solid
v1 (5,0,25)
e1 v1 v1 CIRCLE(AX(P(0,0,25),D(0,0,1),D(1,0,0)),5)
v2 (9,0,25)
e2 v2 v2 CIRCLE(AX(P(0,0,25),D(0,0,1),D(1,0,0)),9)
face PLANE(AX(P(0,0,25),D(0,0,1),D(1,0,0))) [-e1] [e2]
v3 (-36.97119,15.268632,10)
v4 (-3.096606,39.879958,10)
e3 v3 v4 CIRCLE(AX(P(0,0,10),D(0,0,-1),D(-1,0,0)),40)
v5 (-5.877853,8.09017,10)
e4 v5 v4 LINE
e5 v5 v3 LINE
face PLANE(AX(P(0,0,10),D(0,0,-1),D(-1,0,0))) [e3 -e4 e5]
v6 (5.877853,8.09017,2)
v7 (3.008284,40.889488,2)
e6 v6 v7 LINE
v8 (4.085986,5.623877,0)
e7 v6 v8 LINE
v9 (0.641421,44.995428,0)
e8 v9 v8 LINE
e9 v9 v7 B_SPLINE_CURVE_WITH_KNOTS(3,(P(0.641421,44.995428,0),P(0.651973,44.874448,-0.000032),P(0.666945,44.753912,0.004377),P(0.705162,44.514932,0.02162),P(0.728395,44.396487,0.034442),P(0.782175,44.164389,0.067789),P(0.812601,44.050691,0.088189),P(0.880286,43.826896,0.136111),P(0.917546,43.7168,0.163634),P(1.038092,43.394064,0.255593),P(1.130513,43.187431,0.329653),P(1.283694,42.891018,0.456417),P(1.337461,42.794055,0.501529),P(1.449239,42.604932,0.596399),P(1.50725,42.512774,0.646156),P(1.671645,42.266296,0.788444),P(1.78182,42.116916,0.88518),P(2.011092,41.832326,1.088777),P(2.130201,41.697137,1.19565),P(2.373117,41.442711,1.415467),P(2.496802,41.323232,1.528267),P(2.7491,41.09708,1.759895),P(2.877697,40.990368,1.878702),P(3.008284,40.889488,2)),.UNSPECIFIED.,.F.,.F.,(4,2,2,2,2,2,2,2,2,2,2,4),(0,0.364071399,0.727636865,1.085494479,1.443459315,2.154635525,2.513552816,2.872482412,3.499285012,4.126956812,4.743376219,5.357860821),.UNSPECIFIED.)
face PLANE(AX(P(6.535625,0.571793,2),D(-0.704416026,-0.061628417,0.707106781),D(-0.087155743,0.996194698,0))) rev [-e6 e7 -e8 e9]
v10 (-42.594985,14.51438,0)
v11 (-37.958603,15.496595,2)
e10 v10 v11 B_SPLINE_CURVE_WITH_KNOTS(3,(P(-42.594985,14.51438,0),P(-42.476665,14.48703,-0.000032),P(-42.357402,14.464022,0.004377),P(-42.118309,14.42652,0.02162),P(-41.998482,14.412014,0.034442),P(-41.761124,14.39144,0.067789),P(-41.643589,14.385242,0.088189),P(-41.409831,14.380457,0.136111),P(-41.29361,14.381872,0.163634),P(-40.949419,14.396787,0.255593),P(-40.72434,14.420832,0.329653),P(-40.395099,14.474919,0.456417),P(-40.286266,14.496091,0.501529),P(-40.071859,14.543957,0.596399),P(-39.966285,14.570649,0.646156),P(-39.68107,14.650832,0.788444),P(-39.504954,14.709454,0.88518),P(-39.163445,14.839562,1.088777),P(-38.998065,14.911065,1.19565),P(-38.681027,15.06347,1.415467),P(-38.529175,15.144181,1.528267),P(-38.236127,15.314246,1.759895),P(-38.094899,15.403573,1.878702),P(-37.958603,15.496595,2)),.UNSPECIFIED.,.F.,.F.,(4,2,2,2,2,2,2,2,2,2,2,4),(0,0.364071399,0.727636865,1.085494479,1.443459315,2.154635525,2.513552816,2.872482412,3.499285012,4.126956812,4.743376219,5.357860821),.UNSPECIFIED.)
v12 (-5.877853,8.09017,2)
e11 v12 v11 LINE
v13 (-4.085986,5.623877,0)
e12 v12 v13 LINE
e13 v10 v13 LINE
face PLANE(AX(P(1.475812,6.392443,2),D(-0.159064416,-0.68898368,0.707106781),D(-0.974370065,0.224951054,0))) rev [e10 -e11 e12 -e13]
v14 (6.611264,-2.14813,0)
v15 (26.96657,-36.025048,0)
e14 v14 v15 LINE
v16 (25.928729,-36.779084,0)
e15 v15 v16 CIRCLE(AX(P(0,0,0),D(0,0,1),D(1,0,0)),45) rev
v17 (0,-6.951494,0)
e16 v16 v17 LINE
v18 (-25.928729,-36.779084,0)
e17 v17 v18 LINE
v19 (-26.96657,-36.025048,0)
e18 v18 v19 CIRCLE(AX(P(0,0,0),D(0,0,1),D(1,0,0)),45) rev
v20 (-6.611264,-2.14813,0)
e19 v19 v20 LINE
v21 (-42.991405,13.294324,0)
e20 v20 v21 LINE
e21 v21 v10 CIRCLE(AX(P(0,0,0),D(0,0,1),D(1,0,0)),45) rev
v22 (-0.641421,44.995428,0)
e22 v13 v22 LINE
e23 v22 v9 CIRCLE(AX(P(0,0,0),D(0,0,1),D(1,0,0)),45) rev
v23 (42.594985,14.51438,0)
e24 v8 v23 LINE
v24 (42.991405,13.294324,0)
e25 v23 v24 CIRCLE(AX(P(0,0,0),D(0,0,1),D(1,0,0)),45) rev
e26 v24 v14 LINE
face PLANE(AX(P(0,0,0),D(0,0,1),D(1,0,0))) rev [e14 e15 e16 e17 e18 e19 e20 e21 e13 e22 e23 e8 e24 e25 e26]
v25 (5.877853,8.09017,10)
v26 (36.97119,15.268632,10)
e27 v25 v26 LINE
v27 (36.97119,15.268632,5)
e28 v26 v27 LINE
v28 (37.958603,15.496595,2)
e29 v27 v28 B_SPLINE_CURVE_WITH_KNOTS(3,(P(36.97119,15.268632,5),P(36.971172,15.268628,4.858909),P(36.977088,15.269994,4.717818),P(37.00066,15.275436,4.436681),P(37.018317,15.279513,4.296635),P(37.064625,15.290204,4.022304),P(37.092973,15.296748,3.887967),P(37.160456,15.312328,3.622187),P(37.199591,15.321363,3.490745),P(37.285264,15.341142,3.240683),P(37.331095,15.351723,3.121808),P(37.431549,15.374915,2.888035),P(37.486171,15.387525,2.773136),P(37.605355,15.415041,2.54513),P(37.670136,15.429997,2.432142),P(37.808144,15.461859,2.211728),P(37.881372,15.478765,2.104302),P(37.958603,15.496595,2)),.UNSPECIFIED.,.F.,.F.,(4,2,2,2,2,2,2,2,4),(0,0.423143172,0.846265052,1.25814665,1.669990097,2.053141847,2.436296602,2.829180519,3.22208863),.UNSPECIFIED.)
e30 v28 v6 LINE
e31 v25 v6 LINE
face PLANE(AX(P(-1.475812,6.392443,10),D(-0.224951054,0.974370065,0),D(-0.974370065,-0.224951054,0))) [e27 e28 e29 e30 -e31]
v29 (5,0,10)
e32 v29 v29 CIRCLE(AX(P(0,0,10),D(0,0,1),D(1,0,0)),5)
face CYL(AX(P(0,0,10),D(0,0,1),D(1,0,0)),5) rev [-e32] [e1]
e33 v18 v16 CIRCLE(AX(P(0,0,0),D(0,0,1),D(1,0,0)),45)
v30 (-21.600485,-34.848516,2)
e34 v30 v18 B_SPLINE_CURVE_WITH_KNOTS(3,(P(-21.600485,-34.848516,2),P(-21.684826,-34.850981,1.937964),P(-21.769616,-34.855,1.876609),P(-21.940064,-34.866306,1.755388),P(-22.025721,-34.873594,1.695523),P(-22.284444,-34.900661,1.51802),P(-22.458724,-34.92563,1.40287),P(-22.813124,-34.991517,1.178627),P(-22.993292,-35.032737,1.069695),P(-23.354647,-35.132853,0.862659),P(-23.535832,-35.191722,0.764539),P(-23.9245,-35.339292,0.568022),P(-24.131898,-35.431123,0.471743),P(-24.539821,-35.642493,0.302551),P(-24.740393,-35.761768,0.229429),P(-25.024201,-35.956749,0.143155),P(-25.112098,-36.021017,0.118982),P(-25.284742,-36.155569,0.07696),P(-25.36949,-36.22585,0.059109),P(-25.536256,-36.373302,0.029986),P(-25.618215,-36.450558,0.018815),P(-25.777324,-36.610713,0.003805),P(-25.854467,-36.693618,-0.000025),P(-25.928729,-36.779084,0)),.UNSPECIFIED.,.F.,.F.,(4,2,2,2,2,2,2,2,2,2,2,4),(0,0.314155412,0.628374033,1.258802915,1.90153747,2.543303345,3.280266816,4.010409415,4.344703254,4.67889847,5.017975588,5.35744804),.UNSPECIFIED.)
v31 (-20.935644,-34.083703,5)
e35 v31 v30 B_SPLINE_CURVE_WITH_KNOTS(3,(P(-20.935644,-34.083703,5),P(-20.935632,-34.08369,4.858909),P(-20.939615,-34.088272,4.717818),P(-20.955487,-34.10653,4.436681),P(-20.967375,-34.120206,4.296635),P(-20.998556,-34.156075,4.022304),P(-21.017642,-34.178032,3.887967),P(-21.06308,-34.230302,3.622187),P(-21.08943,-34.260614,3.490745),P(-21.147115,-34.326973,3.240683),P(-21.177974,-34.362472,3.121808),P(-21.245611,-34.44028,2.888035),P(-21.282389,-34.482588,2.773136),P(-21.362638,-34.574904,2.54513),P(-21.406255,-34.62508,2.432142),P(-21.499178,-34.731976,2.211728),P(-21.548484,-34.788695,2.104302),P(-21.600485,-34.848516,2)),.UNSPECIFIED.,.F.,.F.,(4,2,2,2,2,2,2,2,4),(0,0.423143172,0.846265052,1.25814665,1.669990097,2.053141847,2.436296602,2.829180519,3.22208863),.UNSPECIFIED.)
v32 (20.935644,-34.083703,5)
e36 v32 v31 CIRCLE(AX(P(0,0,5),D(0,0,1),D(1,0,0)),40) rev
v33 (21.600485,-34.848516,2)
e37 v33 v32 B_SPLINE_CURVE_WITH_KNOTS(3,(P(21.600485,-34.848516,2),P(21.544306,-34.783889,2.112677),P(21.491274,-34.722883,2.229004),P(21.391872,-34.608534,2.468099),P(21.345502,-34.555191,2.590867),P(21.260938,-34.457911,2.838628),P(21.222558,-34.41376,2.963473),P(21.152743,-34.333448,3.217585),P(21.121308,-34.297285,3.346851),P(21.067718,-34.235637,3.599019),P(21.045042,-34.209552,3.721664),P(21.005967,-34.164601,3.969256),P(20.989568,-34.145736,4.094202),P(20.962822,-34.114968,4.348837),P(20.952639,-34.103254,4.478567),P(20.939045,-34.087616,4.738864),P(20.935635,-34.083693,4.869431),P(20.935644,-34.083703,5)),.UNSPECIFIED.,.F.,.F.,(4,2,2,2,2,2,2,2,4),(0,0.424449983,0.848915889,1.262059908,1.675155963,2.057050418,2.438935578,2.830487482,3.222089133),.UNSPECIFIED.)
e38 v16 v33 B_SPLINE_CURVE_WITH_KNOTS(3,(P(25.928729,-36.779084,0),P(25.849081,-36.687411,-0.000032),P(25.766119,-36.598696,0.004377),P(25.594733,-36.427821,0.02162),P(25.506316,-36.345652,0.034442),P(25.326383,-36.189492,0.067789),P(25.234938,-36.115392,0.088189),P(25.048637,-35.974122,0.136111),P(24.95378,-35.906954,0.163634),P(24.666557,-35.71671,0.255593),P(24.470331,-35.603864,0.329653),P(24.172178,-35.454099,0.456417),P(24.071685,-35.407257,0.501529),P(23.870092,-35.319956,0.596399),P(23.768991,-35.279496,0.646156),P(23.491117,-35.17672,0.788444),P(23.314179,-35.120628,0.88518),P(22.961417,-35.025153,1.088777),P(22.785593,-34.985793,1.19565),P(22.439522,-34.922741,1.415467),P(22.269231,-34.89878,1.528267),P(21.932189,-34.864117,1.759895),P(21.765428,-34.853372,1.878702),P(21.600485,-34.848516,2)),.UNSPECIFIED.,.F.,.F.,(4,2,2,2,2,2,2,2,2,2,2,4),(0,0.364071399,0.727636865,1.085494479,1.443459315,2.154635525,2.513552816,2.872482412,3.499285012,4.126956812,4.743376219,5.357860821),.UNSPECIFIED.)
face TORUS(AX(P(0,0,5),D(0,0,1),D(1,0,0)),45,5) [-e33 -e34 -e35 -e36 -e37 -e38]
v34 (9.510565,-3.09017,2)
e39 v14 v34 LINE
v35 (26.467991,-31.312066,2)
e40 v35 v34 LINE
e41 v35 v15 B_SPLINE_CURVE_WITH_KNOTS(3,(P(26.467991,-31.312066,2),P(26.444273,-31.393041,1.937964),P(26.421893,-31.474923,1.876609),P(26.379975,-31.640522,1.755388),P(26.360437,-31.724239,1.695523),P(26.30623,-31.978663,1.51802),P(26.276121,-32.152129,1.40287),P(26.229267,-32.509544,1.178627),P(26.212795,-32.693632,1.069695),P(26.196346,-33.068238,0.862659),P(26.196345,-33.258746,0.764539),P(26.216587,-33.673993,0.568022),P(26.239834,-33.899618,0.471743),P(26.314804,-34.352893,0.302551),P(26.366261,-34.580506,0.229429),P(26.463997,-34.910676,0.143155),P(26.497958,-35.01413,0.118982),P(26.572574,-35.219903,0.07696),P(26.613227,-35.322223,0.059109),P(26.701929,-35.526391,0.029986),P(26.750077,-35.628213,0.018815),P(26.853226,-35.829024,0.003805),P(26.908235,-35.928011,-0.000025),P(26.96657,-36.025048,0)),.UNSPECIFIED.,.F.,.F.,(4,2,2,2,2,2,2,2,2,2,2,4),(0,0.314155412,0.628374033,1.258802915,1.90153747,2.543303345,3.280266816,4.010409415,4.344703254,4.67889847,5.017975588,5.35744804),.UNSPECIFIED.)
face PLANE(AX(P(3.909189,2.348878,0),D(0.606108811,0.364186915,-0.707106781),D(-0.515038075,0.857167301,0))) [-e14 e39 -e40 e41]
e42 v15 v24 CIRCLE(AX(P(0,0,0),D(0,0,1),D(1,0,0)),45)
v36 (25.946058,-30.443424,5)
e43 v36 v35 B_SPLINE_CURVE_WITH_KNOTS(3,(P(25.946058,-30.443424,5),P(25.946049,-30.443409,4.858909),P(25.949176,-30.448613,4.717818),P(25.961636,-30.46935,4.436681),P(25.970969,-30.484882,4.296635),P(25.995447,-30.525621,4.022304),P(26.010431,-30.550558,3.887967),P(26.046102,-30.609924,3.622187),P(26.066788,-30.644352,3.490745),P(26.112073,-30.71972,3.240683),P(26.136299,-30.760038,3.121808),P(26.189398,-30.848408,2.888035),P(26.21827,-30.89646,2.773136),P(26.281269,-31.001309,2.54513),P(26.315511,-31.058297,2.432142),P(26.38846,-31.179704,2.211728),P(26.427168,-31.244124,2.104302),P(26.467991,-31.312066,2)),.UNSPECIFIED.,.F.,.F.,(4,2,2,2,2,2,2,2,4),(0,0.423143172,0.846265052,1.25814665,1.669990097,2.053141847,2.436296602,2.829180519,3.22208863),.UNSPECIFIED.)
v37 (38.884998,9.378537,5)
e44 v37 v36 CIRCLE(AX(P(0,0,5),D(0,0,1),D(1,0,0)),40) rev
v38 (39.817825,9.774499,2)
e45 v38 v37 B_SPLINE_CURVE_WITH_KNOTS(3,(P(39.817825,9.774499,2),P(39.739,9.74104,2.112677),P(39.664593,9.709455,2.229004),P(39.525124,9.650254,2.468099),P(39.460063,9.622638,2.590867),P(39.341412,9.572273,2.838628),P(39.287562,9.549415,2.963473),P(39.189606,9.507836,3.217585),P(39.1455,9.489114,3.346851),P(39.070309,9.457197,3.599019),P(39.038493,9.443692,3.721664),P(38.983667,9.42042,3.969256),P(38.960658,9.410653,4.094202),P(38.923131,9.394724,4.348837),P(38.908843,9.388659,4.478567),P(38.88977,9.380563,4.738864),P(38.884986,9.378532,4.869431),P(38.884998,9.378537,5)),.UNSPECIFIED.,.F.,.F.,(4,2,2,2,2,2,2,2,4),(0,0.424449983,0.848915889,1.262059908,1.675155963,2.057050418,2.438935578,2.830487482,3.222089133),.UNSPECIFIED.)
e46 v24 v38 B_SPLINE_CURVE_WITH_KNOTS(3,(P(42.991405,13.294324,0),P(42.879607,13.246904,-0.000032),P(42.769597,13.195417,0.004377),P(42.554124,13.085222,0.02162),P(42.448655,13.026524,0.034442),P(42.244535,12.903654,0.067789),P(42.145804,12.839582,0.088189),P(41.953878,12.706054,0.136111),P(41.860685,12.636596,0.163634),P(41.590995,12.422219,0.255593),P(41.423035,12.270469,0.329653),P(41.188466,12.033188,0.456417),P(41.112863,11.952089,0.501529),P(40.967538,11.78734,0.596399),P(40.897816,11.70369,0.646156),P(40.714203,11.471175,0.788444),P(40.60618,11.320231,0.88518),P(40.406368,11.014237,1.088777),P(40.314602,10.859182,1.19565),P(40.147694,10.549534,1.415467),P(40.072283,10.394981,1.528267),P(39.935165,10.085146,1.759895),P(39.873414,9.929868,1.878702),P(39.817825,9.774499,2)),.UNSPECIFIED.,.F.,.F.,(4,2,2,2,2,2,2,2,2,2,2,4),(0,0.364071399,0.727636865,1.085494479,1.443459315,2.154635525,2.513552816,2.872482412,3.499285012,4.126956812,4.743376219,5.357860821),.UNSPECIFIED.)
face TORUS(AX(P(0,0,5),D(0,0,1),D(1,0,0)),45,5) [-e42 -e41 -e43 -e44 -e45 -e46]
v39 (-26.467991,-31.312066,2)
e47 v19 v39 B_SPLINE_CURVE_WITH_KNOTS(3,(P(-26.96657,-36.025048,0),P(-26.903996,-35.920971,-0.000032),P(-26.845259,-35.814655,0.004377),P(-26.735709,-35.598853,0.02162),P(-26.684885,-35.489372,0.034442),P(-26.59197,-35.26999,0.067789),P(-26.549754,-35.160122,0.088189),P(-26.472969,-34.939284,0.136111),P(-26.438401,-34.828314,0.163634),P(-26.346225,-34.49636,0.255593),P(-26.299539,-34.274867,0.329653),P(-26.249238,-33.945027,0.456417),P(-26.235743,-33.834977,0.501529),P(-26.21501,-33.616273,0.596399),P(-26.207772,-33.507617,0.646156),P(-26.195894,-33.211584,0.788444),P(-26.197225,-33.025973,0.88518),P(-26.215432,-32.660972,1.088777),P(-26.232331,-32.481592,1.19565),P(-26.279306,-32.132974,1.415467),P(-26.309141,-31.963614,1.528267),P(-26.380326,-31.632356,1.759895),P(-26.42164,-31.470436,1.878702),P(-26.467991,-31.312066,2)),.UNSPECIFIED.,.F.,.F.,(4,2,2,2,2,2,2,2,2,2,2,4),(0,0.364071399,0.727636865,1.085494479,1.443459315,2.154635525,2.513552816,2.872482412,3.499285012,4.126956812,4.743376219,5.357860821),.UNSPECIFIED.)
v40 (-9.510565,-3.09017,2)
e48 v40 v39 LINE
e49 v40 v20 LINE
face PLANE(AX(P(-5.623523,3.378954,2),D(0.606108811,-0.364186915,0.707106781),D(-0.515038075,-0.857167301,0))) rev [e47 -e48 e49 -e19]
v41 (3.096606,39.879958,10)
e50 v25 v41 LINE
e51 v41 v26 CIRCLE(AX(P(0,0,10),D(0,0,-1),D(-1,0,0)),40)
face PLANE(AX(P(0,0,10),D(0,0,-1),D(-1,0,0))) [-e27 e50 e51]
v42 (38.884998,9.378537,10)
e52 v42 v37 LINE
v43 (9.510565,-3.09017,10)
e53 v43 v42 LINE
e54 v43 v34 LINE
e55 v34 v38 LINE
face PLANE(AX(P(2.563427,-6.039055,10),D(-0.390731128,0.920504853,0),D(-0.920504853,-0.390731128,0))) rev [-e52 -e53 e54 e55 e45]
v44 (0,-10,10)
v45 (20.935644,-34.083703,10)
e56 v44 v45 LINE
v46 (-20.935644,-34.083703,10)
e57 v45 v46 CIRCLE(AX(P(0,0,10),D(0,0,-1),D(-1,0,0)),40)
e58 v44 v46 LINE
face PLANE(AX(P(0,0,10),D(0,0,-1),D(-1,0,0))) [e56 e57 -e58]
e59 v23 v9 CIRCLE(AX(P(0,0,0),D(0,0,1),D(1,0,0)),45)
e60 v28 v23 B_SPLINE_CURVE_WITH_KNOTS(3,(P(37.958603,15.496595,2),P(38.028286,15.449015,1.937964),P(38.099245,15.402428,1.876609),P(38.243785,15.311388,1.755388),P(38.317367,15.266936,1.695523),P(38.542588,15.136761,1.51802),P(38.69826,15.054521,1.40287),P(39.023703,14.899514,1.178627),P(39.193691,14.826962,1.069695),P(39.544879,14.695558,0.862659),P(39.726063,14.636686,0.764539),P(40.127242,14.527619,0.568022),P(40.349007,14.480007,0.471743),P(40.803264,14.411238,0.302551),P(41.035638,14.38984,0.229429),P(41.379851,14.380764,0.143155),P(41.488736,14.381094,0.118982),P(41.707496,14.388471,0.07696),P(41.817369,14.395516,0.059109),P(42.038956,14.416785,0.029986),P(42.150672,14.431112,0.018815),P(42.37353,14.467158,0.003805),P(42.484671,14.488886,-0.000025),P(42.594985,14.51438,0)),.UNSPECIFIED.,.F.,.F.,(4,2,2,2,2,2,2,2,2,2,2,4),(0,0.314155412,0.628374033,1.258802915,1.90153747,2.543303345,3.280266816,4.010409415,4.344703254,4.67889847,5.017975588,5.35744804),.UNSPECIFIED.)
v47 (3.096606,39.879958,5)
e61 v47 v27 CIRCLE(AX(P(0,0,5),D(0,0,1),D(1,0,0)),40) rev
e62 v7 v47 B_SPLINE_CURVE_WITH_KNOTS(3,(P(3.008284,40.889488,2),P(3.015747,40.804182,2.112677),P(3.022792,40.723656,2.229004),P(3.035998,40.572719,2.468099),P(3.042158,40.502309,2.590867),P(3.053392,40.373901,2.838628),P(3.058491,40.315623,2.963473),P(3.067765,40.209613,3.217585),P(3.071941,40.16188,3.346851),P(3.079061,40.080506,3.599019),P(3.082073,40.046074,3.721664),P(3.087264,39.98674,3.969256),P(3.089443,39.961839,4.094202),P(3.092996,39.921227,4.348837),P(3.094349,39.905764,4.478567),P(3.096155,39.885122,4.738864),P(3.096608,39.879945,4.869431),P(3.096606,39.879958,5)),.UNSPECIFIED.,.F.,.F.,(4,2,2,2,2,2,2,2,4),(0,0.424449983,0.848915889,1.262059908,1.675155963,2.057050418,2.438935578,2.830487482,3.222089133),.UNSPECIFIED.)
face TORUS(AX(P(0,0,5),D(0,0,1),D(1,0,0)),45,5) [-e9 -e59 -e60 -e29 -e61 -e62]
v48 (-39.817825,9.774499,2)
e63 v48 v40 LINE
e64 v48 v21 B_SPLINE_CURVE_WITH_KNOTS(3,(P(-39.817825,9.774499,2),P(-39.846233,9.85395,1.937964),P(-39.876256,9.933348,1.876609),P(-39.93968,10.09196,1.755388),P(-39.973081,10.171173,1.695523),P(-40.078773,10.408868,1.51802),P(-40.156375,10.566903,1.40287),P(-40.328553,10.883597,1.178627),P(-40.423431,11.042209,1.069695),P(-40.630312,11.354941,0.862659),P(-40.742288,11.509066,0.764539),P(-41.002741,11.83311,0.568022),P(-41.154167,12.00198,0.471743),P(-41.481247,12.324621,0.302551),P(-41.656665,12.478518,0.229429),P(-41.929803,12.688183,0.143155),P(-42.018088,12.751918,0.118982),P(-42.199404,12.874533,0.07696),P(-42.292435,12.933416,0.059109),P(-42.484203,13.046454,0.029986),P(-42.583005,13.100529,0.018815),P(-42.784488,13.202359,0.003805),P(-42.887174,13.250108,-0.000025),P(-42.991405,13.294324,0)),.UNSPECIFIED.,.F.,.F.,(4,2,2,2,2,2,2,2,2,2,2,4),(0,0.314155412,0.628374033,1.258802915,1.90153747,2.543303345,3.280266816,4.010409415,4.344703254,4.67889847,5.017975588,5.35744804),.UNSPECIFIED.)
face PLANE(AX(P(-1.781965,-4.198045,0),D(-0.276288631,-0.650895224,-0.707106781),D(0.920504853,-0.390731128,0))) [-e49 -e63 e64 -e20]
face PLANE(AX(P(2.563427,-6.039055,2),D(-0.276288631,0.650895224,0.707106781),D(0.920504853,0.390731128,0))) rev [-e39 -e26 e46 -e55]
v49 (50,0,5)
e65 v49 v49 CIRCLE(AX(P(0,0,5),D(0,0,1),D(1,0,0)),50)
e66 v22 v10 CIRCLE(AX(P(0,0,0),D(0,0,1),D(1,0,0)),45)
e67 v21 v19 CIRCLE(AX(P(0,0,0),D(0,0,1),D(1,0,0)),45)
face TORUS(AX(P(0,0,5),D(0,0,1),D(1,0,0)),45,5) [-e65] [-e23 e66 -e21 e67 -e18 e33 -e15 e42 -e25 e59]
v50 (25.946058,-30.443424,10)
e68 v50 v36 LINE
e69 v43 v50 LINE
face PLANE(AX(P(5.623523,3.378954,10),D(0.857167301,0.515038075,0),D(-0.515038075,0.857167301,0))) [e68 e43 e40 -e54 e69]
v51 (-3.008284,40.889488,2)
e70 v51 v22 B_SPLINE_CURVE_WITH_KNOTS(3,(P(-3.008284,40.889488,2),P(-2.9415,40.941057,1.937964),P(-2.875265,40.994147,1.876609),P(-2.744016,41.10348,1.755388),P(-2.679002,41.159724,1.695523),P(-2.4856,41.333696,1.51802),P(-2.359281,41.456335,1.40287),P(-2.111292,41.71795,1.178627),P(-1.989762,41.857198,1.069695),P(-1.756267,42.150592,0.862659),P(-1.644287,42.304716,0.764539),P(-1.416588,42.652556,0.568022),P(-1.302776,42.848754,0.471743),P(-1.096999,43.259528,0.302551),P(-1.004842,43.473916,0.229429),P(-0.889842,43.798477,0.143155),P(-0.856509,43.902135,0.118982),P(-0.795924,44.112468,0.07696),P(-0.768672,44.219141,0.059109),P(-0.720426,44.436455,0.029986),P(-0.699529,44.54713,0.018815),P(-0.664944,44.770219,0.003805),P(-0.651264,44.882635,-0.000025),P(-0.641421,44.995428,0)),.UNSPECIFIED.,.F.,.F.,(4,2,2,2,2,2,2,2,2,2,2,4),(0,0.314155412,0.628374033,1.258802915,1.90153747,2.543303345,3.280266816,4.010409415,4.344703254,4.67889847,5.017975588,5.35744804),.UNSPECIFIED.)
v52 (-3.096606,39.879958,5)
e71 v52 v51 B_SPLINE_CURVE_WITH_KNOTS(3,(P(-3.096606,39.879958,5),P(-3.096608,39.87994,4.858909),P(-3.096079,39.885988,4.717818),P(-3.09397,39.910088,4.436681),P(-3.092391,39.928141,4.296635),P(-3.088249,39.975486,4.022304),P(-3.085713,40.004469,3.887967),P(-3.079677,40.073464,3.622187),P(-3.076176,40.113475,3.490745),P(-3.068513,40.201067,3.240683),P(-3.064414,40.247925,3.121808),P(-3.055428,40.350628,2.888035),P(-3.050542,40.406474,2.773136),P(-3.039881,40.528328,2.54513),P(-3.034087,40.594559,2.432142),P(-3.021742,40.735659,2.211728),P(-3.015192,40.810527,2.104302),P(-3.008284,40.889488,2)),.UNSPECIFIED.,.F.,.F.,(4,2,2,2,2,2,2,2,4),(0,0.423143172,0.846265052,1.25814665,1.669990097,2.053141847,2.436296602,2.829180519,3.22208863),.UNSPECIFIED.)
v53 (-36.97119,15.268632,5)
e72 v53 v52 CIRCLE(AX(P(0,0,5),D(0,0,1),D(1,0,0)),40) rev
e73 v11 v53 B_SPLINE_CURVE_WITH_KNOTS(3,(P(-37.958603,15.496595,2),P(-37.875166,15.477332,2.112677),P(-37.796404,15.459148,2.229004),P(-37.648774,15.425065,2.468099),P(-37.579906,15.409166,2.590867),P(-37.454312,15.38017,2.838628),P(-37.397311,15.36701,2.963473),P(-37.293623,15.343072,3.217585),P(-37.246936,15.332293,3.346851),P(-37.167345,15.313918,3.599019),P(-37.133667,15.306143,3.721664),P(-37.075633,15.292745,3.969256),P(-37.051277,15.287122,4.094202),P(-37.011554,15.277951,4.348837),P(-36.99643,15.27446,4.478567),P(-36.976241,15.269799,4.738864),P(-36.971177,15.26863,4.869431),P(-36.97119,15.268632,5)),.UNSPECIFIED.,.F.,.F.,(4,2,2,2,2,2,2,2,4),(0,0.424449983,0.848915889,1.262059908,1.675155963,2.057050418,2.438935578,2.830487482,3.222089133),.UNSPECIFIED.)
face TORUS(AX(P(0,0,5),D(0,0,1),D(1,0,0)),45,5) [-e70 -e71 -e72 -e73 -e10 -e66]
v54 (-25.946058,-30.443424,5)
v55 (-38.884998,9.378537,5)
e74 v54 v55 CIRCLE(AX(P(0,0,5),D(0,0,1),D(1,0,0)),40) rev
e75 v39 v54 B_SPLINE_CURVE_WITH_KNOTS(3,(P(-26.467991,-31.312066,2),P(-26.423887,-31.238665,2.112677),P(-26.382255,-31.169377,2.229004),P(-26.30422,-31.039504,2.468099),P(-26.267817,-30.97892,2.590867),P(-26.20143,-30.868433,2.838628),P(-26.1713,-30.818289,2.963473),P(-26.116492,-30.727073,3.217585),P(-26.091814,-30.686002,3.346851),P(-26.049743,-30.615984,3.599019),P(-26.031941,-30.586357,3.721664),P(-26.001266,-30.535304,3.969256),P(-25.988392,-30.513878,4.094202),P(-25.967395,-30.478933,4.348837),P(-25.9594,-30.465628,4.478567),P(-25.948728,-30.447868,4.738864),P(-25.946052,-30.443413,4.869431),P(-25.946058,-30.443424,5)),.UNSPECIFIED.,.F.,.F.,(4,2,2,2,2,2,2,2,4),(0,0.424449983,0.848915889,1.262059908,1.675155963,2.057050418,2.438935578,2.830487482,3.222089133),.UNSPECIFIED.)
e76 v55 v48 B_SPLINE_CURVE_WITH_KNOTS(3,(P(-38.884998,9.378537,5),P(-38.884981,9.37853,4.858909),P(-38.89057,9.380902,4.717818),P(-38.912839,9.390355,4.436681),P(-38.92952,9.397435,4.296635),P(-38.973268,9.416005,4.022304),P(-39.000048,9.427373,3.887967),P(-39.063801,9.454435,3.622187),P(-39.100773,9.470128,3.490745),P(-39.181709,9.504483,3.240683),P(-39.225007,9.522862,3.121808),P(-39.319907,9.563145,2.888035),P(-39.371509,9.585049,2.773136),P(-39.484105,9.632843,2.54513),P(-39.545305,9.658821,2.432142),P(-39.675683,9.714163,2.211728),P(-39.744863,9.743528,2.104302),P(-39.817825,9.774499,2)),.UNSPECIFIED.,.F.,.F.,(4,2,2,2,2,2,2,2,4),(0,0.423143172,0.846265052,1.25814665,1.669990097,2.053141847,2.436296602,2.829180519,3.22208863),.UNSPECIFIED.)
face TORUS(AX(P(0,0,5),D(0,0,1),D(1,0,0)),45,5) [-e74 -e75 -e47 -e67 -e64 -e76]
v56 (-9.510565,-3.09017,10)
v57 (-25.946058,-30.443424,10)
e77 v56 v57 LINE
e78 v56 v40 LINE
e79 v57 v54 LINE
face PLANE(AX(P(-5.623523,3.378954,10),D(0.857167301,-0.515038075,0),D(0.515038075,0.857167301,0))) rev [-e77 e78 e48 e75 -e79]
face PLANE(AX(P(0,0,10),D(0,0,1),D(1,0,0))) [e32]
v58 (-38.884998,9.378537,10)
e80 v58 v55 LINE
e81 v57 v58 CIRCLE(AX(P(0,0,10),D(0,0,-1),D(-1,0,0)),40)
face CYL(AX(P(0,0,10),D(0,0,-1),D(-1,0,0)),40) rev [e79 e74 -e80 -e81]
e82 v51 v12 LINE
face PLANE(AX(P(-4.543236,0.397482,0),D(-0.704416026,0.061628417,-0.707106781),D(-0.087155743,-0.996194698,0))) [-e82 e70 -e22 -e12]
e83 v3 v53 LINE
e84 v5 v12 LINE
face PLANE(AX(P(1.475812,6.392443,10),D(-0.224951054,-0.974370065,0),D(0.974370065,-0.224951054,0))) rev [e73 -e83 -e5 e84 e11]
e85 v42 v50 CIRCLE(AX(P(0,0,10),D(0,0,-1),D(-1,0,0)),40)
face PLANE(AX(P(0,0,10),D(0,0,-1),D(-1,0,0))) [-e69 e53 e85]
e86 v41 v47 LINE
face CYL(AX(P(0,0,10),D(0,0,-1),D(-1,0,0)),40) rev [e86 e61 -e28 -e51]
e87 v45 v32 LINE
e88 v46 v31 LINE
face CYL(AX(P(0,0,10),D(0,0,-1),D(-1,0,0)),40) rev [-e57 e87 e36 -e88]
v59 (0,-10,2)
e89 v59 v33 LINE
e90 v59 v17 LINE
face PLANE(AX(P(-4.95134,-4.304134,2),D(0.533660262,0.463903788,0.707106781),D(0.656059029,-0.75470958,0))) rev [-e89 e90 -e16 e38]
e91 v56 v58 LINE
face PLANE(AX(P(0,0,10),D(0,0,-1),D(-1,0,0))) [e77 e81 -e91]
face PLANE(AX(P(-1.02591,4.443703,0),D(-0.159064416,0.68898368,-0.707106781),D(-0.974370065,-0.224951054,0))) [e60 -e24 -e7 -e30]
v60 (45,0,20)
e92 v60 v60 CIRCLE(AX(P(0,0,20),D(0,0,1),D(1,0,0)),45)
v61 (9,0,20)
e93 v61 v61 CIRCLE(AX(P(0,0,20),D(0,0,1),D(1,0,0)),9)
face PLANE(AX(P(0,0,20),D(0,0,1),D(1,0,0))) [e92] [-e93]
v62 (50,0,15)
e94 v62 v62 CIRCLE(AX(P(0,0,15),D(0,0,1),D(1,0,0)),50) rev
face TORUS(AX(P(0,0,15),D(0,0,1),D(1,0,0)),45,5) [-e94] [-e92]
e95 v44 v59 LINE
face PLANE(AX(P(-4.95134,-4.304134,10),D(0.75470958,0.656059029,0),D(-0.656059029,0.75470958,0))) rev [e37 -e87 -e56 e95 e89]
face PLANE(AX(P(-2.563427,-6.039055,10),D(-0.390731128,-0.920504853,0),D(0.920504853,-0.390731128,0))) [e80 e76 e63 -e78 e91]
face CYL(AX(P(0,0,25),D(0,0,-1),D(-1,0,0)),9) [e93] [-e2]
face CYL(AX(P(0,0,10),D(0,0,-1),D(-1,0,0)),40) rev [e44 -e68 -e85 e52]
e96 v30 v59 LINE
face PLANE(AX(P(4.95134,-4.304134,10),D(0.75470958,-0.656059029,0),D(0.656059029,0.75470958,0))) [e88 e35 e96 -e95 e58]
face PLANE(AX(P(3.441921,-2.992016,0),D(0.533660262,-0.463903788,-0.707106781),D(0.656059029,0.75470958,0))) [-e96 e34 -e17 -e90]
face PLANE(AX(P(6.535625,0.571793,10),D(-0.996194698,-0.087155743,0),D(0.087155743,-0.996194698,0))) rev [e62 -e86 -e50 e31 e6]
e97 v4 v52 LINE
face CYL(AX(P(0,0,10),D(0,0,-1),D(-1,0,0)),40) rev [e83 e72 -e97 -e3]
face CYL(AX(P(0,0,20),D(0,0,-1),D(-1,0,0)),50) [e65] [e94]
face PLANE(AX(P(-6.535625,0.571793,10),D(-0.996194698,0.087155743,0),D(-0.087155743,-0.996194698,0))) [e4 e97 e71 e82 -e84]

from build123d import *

# Parameters (mm, degrees)
SKETCH1_R           = 50
BOSS_EXTRUDE1_DEPTH = 20
SKETCH2_R           = 9
BOSS_EXTRUDE2_DEPTH = 5
CUT_EXTRUDE4_DEPTH  = 10
CHAMFER2_SIZE       = 2
FILLET1_R           = 5
SKETCH5_R           = 5
CUT_EXTRUDE5_DEPTH  = 15


with BuildPart() as part:
    # Sketch1 → Boss-Extrude1 (new body)
    with BuildSketch(Plane.XY):
        Circle(SKETCH1_R)
    extrude(amount=BOSS_EXTRUDE1_DEPTH)

    # Sketch2 → Boss-Extrude2 (add)
    with BuildSketch(Plane.XY.offset(20)):
        Circle(SKETCH2_R)
    extrude(amount=BOSS_EXTRUDE2_DEPTH)

    # Sketch3 → Cut-Extrude4 (cut)
    with BuildSketch(Plane(origin=(0, 0, 0), x_dir=(-1, 0, 0), z_dir=(0, 0, -1))):
        with BuildLine():
            Line((-36.97118964, 15.26863244), (-5.877852523, 8.090169944))
            Line((-5.877852523, 8.090169944), (-23.511410092, 32.360679775))
            ThreePointArc((-23.511410092, 32.360679775), (-31.425638229, 24.747308175), (-36.97118964, 15.26863244))
        make_face()
        with BuildLine():
            Line((-23.511410092, 32.360679775), (-5.877852523, 8.090169944))
            Line((-5.877852523, 8.090169944), (-3.096606476, 39.879957727))
            ThreePointArc((-3.096606476, 39.879957727), (-13.825032428, 37.534896808), (-23.511410092, 32.360679775))
        make_face()
        with BuildLine():
            Line((3.096606476, 39.879957727), (5.877852523, 8.090169944))
            Line((5.877852523, 8.090169944), (23.511410092, 32.360679775))
            ThreePointArc((23.511410092, 32.360679775), (13.825032428, 37.534896808), (3.096606476, 39.879957727))
        make_face()
        with BuildLine():
            Line((23.511410092, 32.360679775), (5.877852523, 8.090169944))
            Line((5.877852523, 8.090169944), (36.97118964, 15.26863244))
            ThreePointArc((36.97118964, 15.26863244), (31.425638229, 24.747308175), (23.511410092, 32.360679775))
        make_face()
        with BuildLine():
            Line((38.884997692, 9.378536905), (9.510565163, -3.090169944))
            Line((9.510565163, -3.090169944), (38.042260652, -12.360679775))
            ThreePointArc((38.042260652, -12.360679775), (39.507533624, -6.257378602), (40, 0))
            ThreePointArc((40, 0), (39.720271321, 4.722292468), (38.884997692, 9.378536905))
        make_face()
        with BuildLine():
            Line((38.042260652, -12.360679775), (9.510565163, -3.090169944))
            Line((9.510565163, -3.090169944), (25.946058278, -30.443423918))
            ThreePointArc((25.946058278, -30.443423918), (33.247144972, -22.240219226), (38.042260652, -12.360679775))
        make_face()
        with BuildLine():
            Line((20.93564375, -34.083703155), (0, -10))
            Line((0, -10), (0, -40))
            ThreePointArc((0, -40), (10.877772607, -38.492519573), (20.93564375, -34.083703155))
        make_face()
        with BuildLine():
            Line((0, -40), (0, -10))
            Line((0, -10), (-20.93564375, -34.083703155))
            ThreePointArc((-20.93564375, -34.083703155), (-10.877772607, -38.492519573), (0, -40))
        make_face()
        with BuildLine():
            Line((-25.946058278, -30.443423918), (-9.510565163, -3.090169944))
            Line((-9.510565163, -3.090169944), (-38.042260652, -12.360679775))
            ThreePointArc((-38.042260652, -12.360679775), (-33.247144972, -22.240219226), (-25.946058278, -30.443423918))
        make_face()
        with BuildLine():
            Line((-38.042260652, -12.360679775), (-9.510565163, -3.090169944))
            Line((-9.510565163, -3.090169944), (-38.884997692, 9.378536905))
            ThreePointArc((-38.884997692, 9.378536905), (-39.969978165, -1.549466183), (-38.042260652, -12.360679775))
        make_face()
    extrude(amount=-CUT_EXTRUDE4_DEPTH, mode=Mode.SUBTRACT)

    # Chamfer2
    chamfer2_edges = [part.edges().sort_by_distance(p)[0] for p in [
        (-24.197781428, 3.144183481, 0),
        (-17.728311721, -16.766796931, 0),
        (-4.487229499, 23.985063836, 0),
        (-21.424521082, 11.679401192, 0),
        (17.728311721, -16.766796931, 0),
        (24.197781428, 3.144183481, 0),
        (-10.467821875, -22.041851578, 0),
        (10.467821875, -22.041851578, 0),
        (21.424521082, 11.679401192, 0),
        (4.487229499, 23.985063836, 0),
    ]]
    chamfer(chamfer2_edges, length=CHAMFER2_SIZE)

    # Fillet1
    # the kernel refuses this fillet: 5 mm, written as the material it takes off along each edge
    with BuildSketch(Plane(origin=(0, 0, 0), x_dir=(0.33607060875046735, -0.9418367936824779, 0), z_dir=(-0.9418367936824779, -0.33607060875046735, 0))) as fillet1_piece_1_section:
        with BuildLine():
            CenterArc((40 + FILLET1_R, FILLET1_R), FILLET1_R, 180, 90)
            Line((40, FILLET1_R), (40, 0))
            Line((40, 0), (40 + FILLET1_R, 0))
        make_face()
    fillet1_piece_1 = revolve(axis=Axis((0, 0, 0), (0, 0, 1)), revolution_arc=104.724691482, mode=Mode.PRIVATE)
    fillet1_piece_1 = split(fillet1_piece_1, bisect_by=Plane(origin=(-4.951340344, -4.304134495, 0), z_dir=(-0.7547095802227719, -0.6560590289905075, 0)), keep=Keep.TOP, mode=Mode.PRIVATE)
    add(fillet1_piece_1, mode=Mode.SUBTRACT)
    with BuildSketch(Plane(origin=(0, 0, 0), x_dir=(0.33607060875046735, -0.9418367936824779, 0), z_dir=(-0.9418367936824779, -0.33607060875046735, 0))) as fillet1_piece_2_section:
        with BuildLine():
            CenterArc((40 + FILLET1_R, FILLET1_R), FILLET1_R, 180, 90)
            Line((40, FILLET1_R), (40, 0))
            Line((40, 0), (40 + FILLET1_R, 0))
        make_face()
    fillet1_piece_2 = revolve(axis=Axis((0, 0, 0), (0, 0, 1)), revolution_arc=104.724691482, mode=Mode.PRIVATE)
    fillet1_piece_2 = split(fillet1_piece_2, bisect_by=Plane(origin=(-1.720960592, -1.496008219, -2.280295145), z_dir=(-0.5336602620019746, -0.4639037882578497, -0.7071067811865477)), keep=Keep.TOP, mode=Mode.PRIVATE)
    add(fillet1_piece_2, mode=Mode.SUBTRACT)
    with BuildSketch(Plane(origin=(0, 0, 0), x_dir=(0.33607060875046735, -0.9418367936824779, 0), z_dir=(-0.9418367936824779, -0.33607060875046735, 0))) as fillet1_piece_3_section:
        with BuildLine():
            CenterArc((40 + FILLET1_R, FILLET1_R), FILLET1_R, 180, 90)
            Line((40, FILLET1_R), (40, 0))
            Line((40, 0), (40 + FILLET1_R, 0))
        make_face()
    fillet1_piece_3 = revolve(axis=Axis((0, 0, 0), (0, 0, 1)), revolution_arc=104.724691482, mode=Mode.PRIVATE)
    fillet1_piece_3 = split(fillet1_piece_3, bisect_by=Plane(origin=(2.563426848, -6.039055203, 0), z_dir=(0.3907311284892775, -0.9205048534524388, 0)), keep=Keep.TOP, mode=Mode.PRIVATE)
    fillet1_piece_3 = split(fillet1_piece_3, bisect_by=Plane(origin=(5.62352347, 3.378953793, 0), z_dir=(0.8571673007021122, 0.5150380749100543, 0)), keep=Keep.TOP, mode=Mode.PRIVATE)
    add(fillet1_piece_3, mode=Mode.SUBTRACT)
    with BuildSketch(Plane(origin=(0, 0, 0), x_dir=(0.33607060875046735, -0.9418367936824779, 0), z_dir=(-0.9418367936824779, -0.33607060875046735, 0))) as fillet1_piece_4_section:
        with BuildLine():
            CenterArc((40 + FILLET1_R, FILLET1_R), FILLET1_R, 180, 90)
            Line((40, FILLET1_R), (40, 0))
            Line((40, 0), (40 + FILLET1_R, 0))
        make_face()
    fillet1_piece_4 = revolve(axis=Axis((0, 0, 0), (0, 0, 1)), revolution_arc=104.724691482, mode=Mode.PRIVATE)
    fillet1_piece_4 = split(fillet1_piece_4, bisect_by=Plane(origin=(0.890982295, -2.099022748, -2.280295145), z_dir=(0.2762886305754404, -0.6508952239913486, -0.7071067811865477)), keep=Keep.TOP, mode=Mode.PRIVATE)
    fillet1_piece_4 = split(fillet1_piece_4, bisect_by=Plane(origin=(1.954594434, 1.174438822, -2.280295145), z_dir=(0.6061088109378321, 0.36418691533816455, -0.7071067811865476)), keep=Keep.TOP, mode=Mode.PRIVATE)
    add(fillet1_piece_4, mode=Mode.SUBTRACT)
    with BuildSketch(Plane(origin=(0, 0, 0), x_dir=(0.33607060875046735, -0.9418367936824779, 0), z_dir=(-0.9418367936824779, -0.33607060875046735, 0))) as fillet1_piece_5_section:
        with BuildLine():
            CenterArc((40 + FILLET1_R, FILLET1_R), FILLET1_R, 180, 90)
            Line((40, FILLET1_R), (40, 0))
            Line((40, 0), (40 + FILLET1_R, 0))
        make_face()
    fillet1_piece_5 = revolve(axis=Axis((0, 0, 0), (0, 0, 1)), revolution_arc=104.724691482, mode=Mode.PRIVATE)
    fillet1_piece_5 = split(fillet1_piece_5, bisect_by=Plane(origin=(-1.475811703, 6.392442786, 0), z_dir=(-0.22495105434386392, 0.9743700647852355, 0)), keep=Keep.TOP, mode=Mode.PRIVATE)
    add(fillet1_piece_5, mode=Mode.SUBTRACT)
    with BuildSketch(Plane(origin=(0, 0, 0), x_dir=(0.33607060875046735, -0.9418367936824779, 0), z_dir=(-0.9418367936824779, -0.33607060875046735, 0))) as fillet1_piece_6_section:
        with BuildLine():
            CenterArc((40 + FILLET1_R, FILLET1_R), FILLET1_R, 180, 90)
            Line((40, FILLET1_R), (40, 0))
            Line((40, 0), (40 + FILLET1_R, 0))
        make_face()
    fillet1_piece_6 = revolve(axis=Axis((0, 0, 0), (0, 0, 1)), revolution_arc=104.724691482, mode=Mode.PRIVATE)
    fillet1_piece_6 = split(fillet1_piece_6, bisect_by=Plane(origin=(-0.512954797, 2.221851328, -2.280295145), z_dir=(-0.15906441596160978, 0.6889836801948155, -0.7071067811865477)), keep=Keep.TOP, mode=Mode.PRIVATE)
    add(fillet1_piece_6, mode=Mode.SUBTRACT)
    with BuildSketch(Plane(origin=(0, 0, 0), x_dir=(-0.7918884905044262, -0.610665717562908, 0), z_dir=(-0.610665717562908, 0.7918884905044262, 0))) as fillet1_piece_7_section:
        with BuildLine():
            CenterArc((40 + FILLET1_R, FILLET1_R), FILLET1_R, 180, 90)
            Line((40, FILLET1_R), (40, 0))
            Line((40, 0), (40 + FILLET1_R, 0))
        make_face()
    fillet1_piece_7 = revolve(axis=Axis((0, 0, 0), (0, 0, 1)), revolution_arc=104.724691482, mode=Mode.PRIVATE)
    fillet1_piece_7 = split(fillet1_piece_7, bisect_by=Plane(origin=(-5.62352347, 3.378953793, 0), z_dir=(-0.8571673007021121, 0.5150380749100545, 0)), keep=Keep.TOP, mode=Mode.PRIVATE)
    add(fillet1_piece_7, mode=Mode.SUBTRACT)
    with BuildSketch(Plane(origin=(0, 0, 0), x_dir=(-0.7918884905044262, -0.610665717562908, 0), z_dir=(-0.610665717562908, 0.7918884905044262, 0))) as fillet1_piece_8_section:
        with BuildLine():
            CenterArc((40 + FILLET1_R, FILLET1_R), FILLET1_R, 180, 90)
            Line((40, FILLET1_R), (40, 0))
            Line((40, 0), (40 + FILLET1_R, 0))
        make_face()
    fillet1_piece_8 = revolve(axis=Axis((0, 0, 0), (0, 0, 1)), revolution_arc=104.724691482, mode=Mode.PRIVATE)
    fillet1_piece_8 = split(fillet1_piece_8, bisect_by=Plane(origin=(-1.954594434, 1.174438822, -2.280295145), z_dir=(-0.6061088109378319, 0.3641869153381646, -0.7071067811865477)), keep=Keep.TOP, mode=Mode.PRIVATE)
    add(fillet1_piece_8, mode=Mode.SUBTRACT)
    with BuildSketch(Plane(origin=(0, 0, 0), x_dir=(-0.7918884905044262, -0.610665717562908, 0), z_dir=(-0.610665717562908, 0.7918884905044262, 0))) as fillet1_piece_9_section:
        with BuildLine():
            CenterArc((40 + FILLET1_R, FILLET1_R), FILLET1_R, 180, 90)
            Line((40, FILLET1_R), (40, 0))
            Line((40, 0), (40 + FILLET1_R, 0))
        make_face()
    fillet1_piece_9 = revolve(axis=Axis((0, 0, 0), (0, 0, 1)), revolution_arc=104.724691482, mode=Mode.PRIVATE)
    fillet1_piece_9 = split(fillet1_piece_9, bisect_by=Plane(origin=(-4.951340344, -4.304134495, 0), z_dir=(-0.7547095802227719, -0.6560590289905075, 0)), keep=Keep.TOP, mode=Mode.PRIVATE)
    fillet1_piece_9 = split(fillet1_piece_9, bisect_by=Plane(origin=(4.951340344, -4.304134495, 0), z_dir=(0.7547095802227719, -0.6560590289905074, 0)), keep=Keep.TOP, mode=Mode.PRIVATE)
    add(fillet1_piece_9, mode=Mode.SUBTRACT)
    with BuildSketch(Plane(origin=(0, 0, 0), x_dir=(-0.7918884905044262, -0.610665717562908, 0), z_dir=(-0.610665717562908, 0.7918884905044262, 0))) as fillet1_piece_10_section:
        with BuildLine():
            CenterArc((40 + FILLET1_R, FILLET1_R), FILLET1_R, 180, 90)
            Line((40, FILLET1_R), (40, 0))
            Line((40, 0), (40 + FILLET1_R, 0))
        make_face()
    fillet1_piece_10 = revolve(axis=Axis((0, 0, 0), (0, 0, 1)), revolution_arc=104.724691482, mode=Mode.PRIVATE)
    fillet1_piece_10 = split(fillet1_piece_10, bisect_by=Plane(origin=(-1.720960592, -1.496008219, -2.280295145), z_dir=(-0.5336602620019746, -0.4639037882578497, -0.7071067811865477)), keep=Keep.TOP, mode=Mode.PRIVATE)
    fillet1_piece_10 = split(fillet1_piece_10, bisect_by=Plane(origin=(1.720960592, -1.496008219, -2.280295145), z_dir=(0.5336602620019747, -0.46390378825784945, -0.7071067811865477)), keep=Keep.TOP, mode=Mode.PRIVATE)
    add(fillet1_piece_10, mode=Mode.SUBTRACT)
    with BuildSketch(Plane(origin=(0, 0, 0), x_dir=(-0.7918884905044262, -0.610665717562908, 0), z_dir=(-0.610665717562908, 0.7918884905044262, 0))) as fillet1_piece_11_section:
        with BuildLine():
            CenterArc((40 + FILLET1_R, FILLET1_R), FILLET1_R, 180, 90)
            Line((40, FILLET1_R), (40, 0))
            Line((40, 0), (40 + FILLET1_R, 0))
        make_face()
    fillet1_piece_11 = revolve(axis=Axis((0, 0, 0), (0, 0, 1)), revolution_arc=104.724691482, mode=Mode.PRIVATE)
    fillet1_piece_11 = split(fillet1_piece_11, bisect_by=Plane(origin=(5.62352347, 3.378953793, 0), z_dir=(0.8571673007021122, 0.5150380749100543, 0)), keep=Keep.TOP, mode=Mode.PRIVATE)
    add(fillet1_piece_11, mode=Mode.SUBTRACT)
    with BuildSketch(Plane(origin=(0, 0, 0), x_dir=(-0.7918884905044262, -0.610665717562908, 0), z_dir=(-0.610665717562908, 0.7918884905044262, 0))) as fillet1_piece_12_section:
        with BuildLine():
            CenterArc((40 + FILLET1_R, FILLET1_R), FILLET1_R, 180, 90)
            Line((40, FILLET1_R), (40, 0))
            Line((40, 0), (40 + FILLET1_R, 0))
        make_face()
    fillet1_piece_12 = revolve(axis=Axis((0, 0, 0), (0, 0, 1)), revolution_arc=104.724691482, mode=Mode.PRIVATE)
    fillet1_piece_12 = split(fillet1_piece_12, bisect_by=Plane(origin=(1.954594434, 1.174438822, -2.280295145), z_dir=(0.6061088109378321, 0.36418691533816455, -0.7071067811865476)), keep=Keep.TOP, mode=Mode.PRIVATE)
    add(fillet1_piece_12, mode=Mode.SUBTRACT)
    with BuildSketch(Plane(origin=(0, 0, 0), x_dir=(-0.8254846111820394, 0.5644246244642743, 0), z_dir=(0.5644246244642743, 0.8254846111820394, 0))) as fillet1_piece_13_section:
        with BuildLine():
            CenterArc((40 + FILLET1_R, FILLET1_R), FILLET1_R, 180, 90)
            Line((40, FILLET1_R), (40, 0))
            Line((40, 0), (40 + FILLET1_R, 0))
        make_face()
    fillet1_piece_13 = revolve(axis=Axis((0, 0, 0), (0, 0, 1)), revolution_arc=104.724691482, mode=Mode.PRIVATE)
    fillet1_piece_13 = split(fillet1_piece_13, bisect_by=Plane(origin=(1.475811703, 6.392442786, 0), z_dir=(0.2249510543438882, 0.9743700647852299, 0)), keep=Keep.TOP, mode=Mode.PRIVATE)
    add(fillet1_piece_13, mode=Mode.SUBTRACT)
    with BuildSketch(Plane(origin=(0, 0, 0), x_dir=(-0.8254846111820394, 0.5644246244642743, 0), z_dir=(0.5644246244642743, 0.8254846111820394, 0))) as fillet1_piece_14_section:
        with BuildLine():
            CenterArc((40 + FILLET1_R, FILLET1_R), FILLET1_R, 180, 90)
            Line((40, FILLET1_R), (40, 0))
            Line((40, 0), (40 + FILLET1_R, 0))
        make_face()
    fillet1_piece_14 = revolve(axis=Axis((0, 0, 0), (0, 0, 1)), revolution_arc=104.724691482, mode=Mode.PRIVATE)
    fillet1_piece_14 = split(fillet1_piece_14, bisect_by=Plane(origin=(0.512954797, 2.221851328, -2.280295145), z_dir=(0.15906441596162676, 0.6889836801948115, -0.7071067811865477)), keep=Keep.TOP, mode=Mode.PRIVATE)
    add(fillet1_piece_14, mode=Mode.SUBTRACT)
    with BuildSketch(Plane(origin=(0, 0, 0), x_dir=(-0.8254846111820394, 0.5644246244642743, 0), z_dir=(0.5644246244642743, 0.8254846111820394, 0))) as fillet1_piece_15_section:
        with BuildLine():
            CenterArc((40 + FILLET1_R, FILLET1_R), FILLET1_R, 180, 90)
            Line((40, FILLET1_R), (40, 0))
            Line((40, 0), (40 + FILLET1_R, 0))
        make_face()
    fillet1_piece_15 = revolve(axis=Axis((0, 0, 0), (0, 0, 1)), revolution_arc=104.724691482, mode=Mode.PRIVATE)
    fillet1_piece_15 = split(fillet1_piece_15, bisect_by=Plane(origin=(-5.62352347, 3.378953793, 0), z_dir=(-0.8571673007021121, 0.5150380749100545, 0)), keep=Keep.TOP, mode=Mode.PRIVATE)
    fillet1_piece_15 = split(fillet1_piece_15, bisect_by=Plane(origin=(-2.563426848, -6.039055203, 0), z_dir=(-0.39073112848929537, -0.9205048534524312, 0)), keep=Keep.TOP, mode=Mode.PRIVATE)
    add(fillet1_piece_15, mode=Mode.SUBTRACT)
    with BuildSketch(Plane(origin=(0, 0, 0), x_dir=(-0.8254846111820394, 0.5644246244642743, 0), z_dir=(0.5644246244642743, 0.8254846111820394, 0))) as fillet1_piece_16_section:
        with BuildLine():
            CenterArc((40 + FILLET1_R, FILLET1_R), FILLET1_R, 180, 90)
            Line((40, FILLET1_R), (40, 0))
            Line((40, 0), (40 + FILLET1_R, 0))
        make_face()
    fillet1_piece_16 = revolve(axis=Axis((0, 0, 0), (0, 0, 1)), revolution_arc=104.724691482, mode=Mode.PRIVATE)
    fillet1_piece_16 = split(fillet1_piece_16, bisect_by=Plane(origin=(-1.954594434, 1.174438822, -2.280295145), z_dir=(-0.6061088109378319, 0.3641869153381646, -0.7071067811865477)), keep=Keep.TOP, mode=Mode.PRIVATE)
    fillet1_piece_16 = split(fillet1_piece_16, bisect_by=Plane(origin=(-0.890982295, -2.099022748, -2.280295145), z_dir=(-0.2762886305754528, -0.650895223991343, -0.7071067811865479)), keep=Keep.TOP, mode=Mode.PRIVATE)
    add(fillet1_piece_16, mode=Mode.SUBTRACT)
    with BuildSketch(Plane(origin=(0, 0, 0), x_dir=(-0.8254846111820394, 0.5644246244642743, 0), z_dir=(0.5644246244642743, 0.8254846111820394, 0))) as fillet1_piece_17_section:
        with BuildLine():
            CenterArc((40 + FILLET1_R, FILLET1_R), FILLET1_R, 180, 90)
            Line((40, FILLET1_R), (40, 0))
            Line((40, 0), (40 + FILLET1_R, 0))
        make_face()
    fillet1_piece_17 = revolve(axis=Axis((0, 0, 0), (0, 0, 1)), revolution_arc=104.724691482, mode=Mode.PRIVATE)
    fillet1_piece_17 = split(fillet1_piece_17, bisect_by=Plane(origin=(4.951340344, -4.304134495, 0), z_dir=(0.7547095802227719, -0.6560590289905074, 0)), keep=Keep.TOP, mode=Mode.PRIVATE)
    add(fillet1_piece_17, mode=Mode.SUBTRACT)
    with BuildSketch(Plane(origin=(0, 0, 0), x_dir=(-0.8254846111820394, 0.5644246244642743, 0), z_dir=(0.5644246244642743, 0.8254846111820394, 0))) as fillet1_piece_18_section:
        with BuildLine():
            CenterArc((40 + FILLET1_R, FILLET1_R), FILLET1_R, 180, 90)
            Line((40, FILLET1_R), (40, 0))
            Line((40, 0), (40 + FILLET1_R, 0))
        make_face()
    fillet1_piece_18 = revolve(axis=Axis((0, 0, 0), (0, 0, 1)), revolution_arc=104.724691482, mode=Mode.PRIVATE)
    fillet1_piece_18 = split(fillet1_piece_18, bisect_by=Plane(origin=(1.720960592, -1.496008219, -2.280295145), z_dir=(0.5336602620019747, -0.46390378825784945, -0.7071067811865477)), keep=Keep.TOP, mode=Mode.PRIVATE)
    add(fillet1_piece_18, mode=Mode.SUBTRACT)
    with BuildSketch(Plane(origin=(0, 0, 0), x_dir=(0.2817109436039243, 0.959499319569215, 0), z_dir=(0.959499319569215, -0.2817109436039243, 0))) as fillet1_piece_19_section:
        with BuildLine():
            CenterArc((40 + FILLET1_R, FILLET1_R), FILLET1_R, 180, 90)
            Line((40, FILLET1_R), (40, 0))
            Line((40, 0), (40 + FILLET1_R, 0))
        make_face()
    fillet1_piece_19 = revolve(axis=Axis((0, 0, 0), (0, 0, 1)), revolution_arc=104.724691482, mode=Mode.PRIVATE)
    fillet1_piece_19 = split(fillet1_piece_19, bisect_by=Plane(origin=(6.535625263, 0.57179312, 0), z_dir=(0.9961946980917454, 0.08715574274765994, 0)), keep=Keep.TOP, mode=Mode.PRIVATE)
    add(fillet1_piece_19, mode=Mode.SUBTRACT)
    with BuildSketch(Plane(origin=(0, 0, 0), x_dir=(0.2817109436039243, 0.959499319569215, 0), z_dir=(0.959499319569215, -0.2817109436039243, 0))) as fillet1_piece_20_section:
        with BuildLine():
            CenterArc((40 + FILLET1_R, FILLET1_R), FILLET1_R, 180, 90)
            Line((40, FILLET1_R), (40, 0))
            Line((40, 0), (40 + FILLET1_R, 0))
        make_face()
    fillet1_piece_20 = revolve(axis=Axis((0, 0, 0), (0, 0, 1)), revolution_arc=104.724691482, mode=Mode.PRIVATE)
    fillet1_piece_20 = split(fillet1_piece_20, bisect_by=Plane(origin=(2.271617933, 0.198740817, -2.280295145), z_dir=(0.7044160264027587, 0.0616284167162206, -0.7071067811865476)), keep=Keep.TOP, mode=Mode.PRIVATE)
    add(fillet1_piece_20, mode=Mode.SUBTRACT)
    with BuildSketch(Plane(origin=(0, 0, 0), x_dir=(0.2817109436039243, 0.959499319569215, 0), z_dir=(0.959499319569215, -0.2817109436039243, 0))) as fillet1_piece_21_section:
        with BuildLine():
            CenterArc((40 + FILLET1_R, FILLET1_R), FILLET1_R, 180, 90)
            Line((40, FILLET1_R), (40, 0))
            Line((40, 0), (40 + FILLET1_R, 0))
        make_face()
    fillet1_piece_21 = revolve(axis=Axis((0, 0, 0), (0, 0, 1)), revolution_arc=104.724691482, mode=Mode.PRIVATE)
    fillet1_piece_21 = split(fillet1_piece_21, bisect_by=Plane(origin=(1.475811703, 6.392442786, 0), z_dir=(0.2249510543438882, 0.9743700647852299, 0)), keep=Keep.TOP, mode=Mode.PRIVATE)
    fillet1_piece_21 = split(fillet1_piece_21, bisect_by=Plane(origin=(-6.535625263, 0.57179312, 0), z_dir=(-0.9961946980917457, 0.08715574274765678, 0)), keep=Keep.TOP, mode=Mode.PRIVATE)
    add(fillet1_piece_21, mode=Mode.SUBTRACT)
    with BuildSketch(Plane(origin=(0, 0, 0), x_dir=(0.2817109436039243, 0.959499319569215, 0), z_dir=(0.959499319569215, -0.2817109436039243, 0))) as fillet1_piece_22_section:
        with BuildLine():
            CenterArc((40 + FILLET1_R, FILLET1_R), FILLET1_R, 180, 90)
            Line((40, FILLET1_R), (40, 0))
            Line((40, 0), (40 + FILLET1_R, 0))
        make_face()
    fillet1_piece_22 = revolve(axis=Axis((0, 0, 0), (0, 0, 1)), revolution_arc=104.724691482, mode=Mode.PRIVATE)
    fillet1_piece_22 = split(fillet1_piece_22, bisect_by=Plane(origin=(0.512954797, 2.221851328, -2.280295145), z_dir=(0.15906441596162676, 0.6889836801948115, -0.7071067811865477)), keep=Keep.TOP, mode=Mode.PRIVATE)
    fillet1_piece_22 = split(fillet1_piece_22, bisect_by=Plane(origin=(-2.271617933, 0.198740817, -2.280295145), z_dir=(-0.7044160264027588, 0.06162841671621832, -0.7071067811865476)), keep=Keep.TOP, mode=Mode.PRIVATE)
    add(fillet1_piece_22, mode=Mode.SUBTRACT)
    with BuildSketch(Plane(origin=(0, 0, 0), x_dir=(0.2817109436039243, 0.959499319569215, 0), z_dir=(0.959499319569215, -0.2817109436039243, 0))) as fillet1_piece_23_section:
        with BuildLine():
            CenterArc((40 + FILLET1_R, FILLET1_R), FILLET1_R, 180, 90)
            Line((40, FILLET1_R), (40, 0))
            Line((40, 0), (40 + FILLET1_R, 0))
        make_face()
    fillet1_piece_23 = revolve(axis=Axis((0, 0, 0), (0, 0, 1)), revolution_arc=104.724691482, mode=Mode.PRIVATE)
    fillet1_piece_23 = split(fillet1_piece_23, bisect_by=Plane(origin=(-2.563426848, -6.039055203, 0), z_dir=(-0.39073112848929537, -0.9205048534524312, 0)), keep=Keep.TOP, mode=Mode.PRIVATE)
    add(fillet1_piece_23, mode=Mode.SUBTRACT)
    with BuildSketch(Plane(origin=(0, 0, 0), x_dir=(0.2817109436039243, 0.959499319569215, 0), z_dir=(0.959499319569215, -0.2817109436039243, 0))) as fillet1_piece_24_section:
        with BuildLine():
            CenterArc((40 + FILLET1_R, FILLET1_R), FILLET1_R, 180, 90)
            Line((40, FILLET1_R), (40, 0))
            Line((40, 0), (40 + FILLET1_R, 0))
        make_face()
    fillet1_piece_24 = revolve(axis=Axis((0, 0, 0), (0, 0, 1)), revolution_arc=104.724691482, mode=Mode.PRIVATE)
    fillet1_piece_24 = split(fillet1_piece_24, bisect_by=Plane(origin=(-0.890982295, -2.099022748, -2.280295145), z_dir=(-0.2762886305754528, -0.650895223991343, -0.7071067811865479)), keep=Keep.TOP, mode=Mode.PRIVATE)
    add(fillet1_piece_24, mode=Mode.SUBTRACT)
    with BuildSketch(Plane(origin=(0, 0, 0), x_dir=(0.9995915493320829, 0.028578567211915915, 0), z_dir=(0.028578567211915915, -0.9995915493320829, 0))) as fillet1_piece_25_section:
        with BuildLine():
            CenterArc((40 + FILLET1_R, FILLET1_R), FILLET1_R, 180, 90)
            Line((40, FILLET1_R), (40, 0))
            Line((40, 0), (40 + FILLET1_R, 0))
        make_face()
    fillet1_piece_25 = revolve(axis=Axis((0, 0, 0), (0, 0, 1)), revolution_arc=104.724691482, mode=Mode.PRIVATE)
    fillet1_piece_25 = split(fillet1_piece_25, bisect_by=Plane(origin=(2.563426848, -6.039055203, 0), z_dir=(0.3907311284892775, -0.9205048534524388, 0)), keep=Keep.TOP, mode=Mode.PRIVATE)
    add(fillet1_piece_25, mode=Mode.SUBTRACT)
    with BuildSketch(Plane(origin=(0, 0, 0), x_dir=(0.9995915493320829, 0.028578567211915915, 0), z_dir=(0.028578567211915915, -0.9995915493320829, 0))) as fillet1_piece_26_section:
        with BuildLine():
            CenterArc((40 + FILLET1_R, FILLET1_R), FILLET1_R, 180, 90)
            Line((40, FILLET1_R), (40, 0))
            Line((40, 0), (40 + FILLET1_R, 0))
        make_face()
    fillet1_piece_26 = revolve(axis=Axis((0, 0, 0), (0, 0, 1)), revolution_arc=104.724691482, mode=Mode.PRIVATE)
    fillet1_piece_26 = split(fillet1_piece_26, bisect_by=Plane(origin=(0.890982295, -2.099022748, -2.280295145), z_dir=(0.2762886305754404, -0.6508952239913486, -0.7071067811865477)), keep=Keep.TOP, mode=Mode.PRIVATE)
    add(fillet1_piece_26, mode=Mode.SUBTRACT)
    with BuildSketch(Plane(origin=(0, 0, 0), x_dir=(0.9995915493320829, 0.028578567211915915, 0), z_dir=(0.028578567211915915, -0.9995915493320829, 0))) as fillet1_piece_27_section:
        with BuildLine():
            CenterArc((40 + FILLET1_R, FILLET1_R), FILLET1_R, 180, 90)
            Line((40, FILLET1_R), (40, 0))
            Line((40, 0), (40 + FILLET1_R, 0))
        make_face()
    fillet1_piece_27 = revolve(axis=Axis((0, 0, 0), (0, 0, 1)), revolution_arc=104.724691482, mode=Mode.PRIVATE)
    fillet1_piece_27 = split(fillet1_piece_27, bisect_by=Plane(origin=(6.535625263, 0.57179312, 0), z_dir=(0.9961946980917454, 0.08715574274765994, 0)), keep=Keep.TOP, mode=Mode.PRIVATE)
    fillet1_piece_27 = split(fillet1_piece_27, bisect_by=Plane(origin=(-1.475811703, 6.392442786, 0), z_dir=(-0.22495105434386392, 0.9743700647852355, 0)), keep=Keep.TOP, mode=Mode.PRIVATE)
    add(fillet1_piece_27, mode=Mode.SUBTRACT)
    with BuildSketch(Plane(origin=(0, 0, 0), x_dir=(0.9995915493320829, 0.028578567211915915, 0), z_dir=(0.028578567211915915, -0.9995915493320829, 0))) as fillet1_piece_28_section:
        with BuildLine():
            CenterArc((40 + FILLET1_R, FILLET1_R), FILLET1_R, 180, 90)
            Line((40, FILLET1_R), (40, 0))
            Line((40, 0), (40 + FILLET1_R, 0))
        make_face()
    fillet1_piece_28 = revolve(axis=Axis((0, 0, 0), (0, 0, 1)), revolution_arc=104.724691482, mode=Mode.PRIVATE)
    fillet1_piece_28 = split(fillet1_piece_28, bisect_by=Plane(origin=(2.271617933, 0.198740817, -2.280295145), z_dir=(0.7044160264027587, 0.0616284167162206, -0.7071067811865476)), keep=Keep.TOP, mode=Mode.PRIVATE)
    fillet1_piece_28 = split(fillet1_piece_28, bisect_by=Plane(origin=(-0.512954797, 2.221851328, -2.280295145), z_dir=(-0.15906441596160978, 0.6889836801948155, -0.7071067811865477)), keep=Keep.TOP, mode=Mode.PRIVATE)
    add(fillet1_piece_28, mode=Mode.SUBTRACT)
    with BuildSketch(Plane(origin=(0, 0, 0), x_dir=(0.9995915493320829, 0.028578567211915915, 0), z_dir=(0.028578567211915915, -0.9995915493320829, 0))) as fillet1_piece_29_section:
        with BuildLine():
            CenterArc((40 + FILLET1_R, FILLET1_R), FILLET1_R, 180, 90)
            Line((40, FILLET1_R), (40, 0))
            Line((40, 0), (40 + FILLET1_R, 0))
        make_face()
    fillet1_piece_29 = revolve(axis=Axis((0, 0, 0), (0, 0, 1)), revolution_arc=104.724691482, mode=Mode.PRIVATE)
    fillet1_piece_29 = split(fillet1_piece_29, bisect_by=Plane(origin=(-6.535625263, 0.57179312, 0), z_dir=(-0.9961946980917457, 0.08715574274765678, 0)), keep=Keep.TOP, mode=Mode.PRIVATE)
    add(fillet1_piece_29, mode=Mode.SUBTRACT)
    with BuildSketch(Plane(origin=(0, 0, 0), x_dir=(0.9995915493320829, 0.028578567211915915, 0), z_dir=(0.028578567211915915, -0.9995915493320829, 0))) as fillet1_piece_30_section:
        with BuildLine():
            CenterArc((40 + FILLET1_R, FILLET1_R), FILLET1_R, 180, 90)
            Line((40, FILLET1_R), (40, 0))
            Line((40, 0), (40 + FILLET1_R, 0))
        make_face()
    fillet1_piece_30 = revolve(axis=Axis((0, 0, 0), (0, 0, 1)), revolution_arc=104.724691482, mode=Mode.PRIVATE)
    fillet1_piece_30 = split(fillet1_piece_30, bisect_by=Plane(origin=(-2.271617933, 0.198740817, -2.280295145), z_dir=(-0.7044160264027588, 0.06162841671621832, -0.7071067811865476)), keep=Keep.TOP, mode=Mode.PRIVATE)
    add(fillet1_piece_30, mode=Mode.SUBTRACT)

    # Fillet2: read off the stored shape, not the designer's step
    # Fillet2 outline → Fillet2 (revolve, cut)
    with BuildSketch(Plane.XZ):
        with BuildLine():
            ThreePointArc((50, 5), (48.535533906, 1.464466094), (45, 0))
            Line((45, 0), (50, 0))
            Line((50, 0), (50, 5))
        make_face()
        with BuildLine():
            ThreePointArc((45, 20), (48.535533906, 18.535533906), (50, 15))
            Line((50, 15), (50, 20))
            Line((50, 20), (45, 20))
        make_face()
    revolve(axis=Axis((0, 0, 0), (0, 0, 1)), mode=Mode.SUBTRACT)

    # Sketch5 → Cut-Extrude5 (cut)
    with BuildSketch(Plane.XY.offset(25)):
        Circle(SKETCH5_R)
    extrude(amount=-CUT_EXTRUDE5_DEPTH, mode=Mode.SUBTRACT)


solid = part.part
